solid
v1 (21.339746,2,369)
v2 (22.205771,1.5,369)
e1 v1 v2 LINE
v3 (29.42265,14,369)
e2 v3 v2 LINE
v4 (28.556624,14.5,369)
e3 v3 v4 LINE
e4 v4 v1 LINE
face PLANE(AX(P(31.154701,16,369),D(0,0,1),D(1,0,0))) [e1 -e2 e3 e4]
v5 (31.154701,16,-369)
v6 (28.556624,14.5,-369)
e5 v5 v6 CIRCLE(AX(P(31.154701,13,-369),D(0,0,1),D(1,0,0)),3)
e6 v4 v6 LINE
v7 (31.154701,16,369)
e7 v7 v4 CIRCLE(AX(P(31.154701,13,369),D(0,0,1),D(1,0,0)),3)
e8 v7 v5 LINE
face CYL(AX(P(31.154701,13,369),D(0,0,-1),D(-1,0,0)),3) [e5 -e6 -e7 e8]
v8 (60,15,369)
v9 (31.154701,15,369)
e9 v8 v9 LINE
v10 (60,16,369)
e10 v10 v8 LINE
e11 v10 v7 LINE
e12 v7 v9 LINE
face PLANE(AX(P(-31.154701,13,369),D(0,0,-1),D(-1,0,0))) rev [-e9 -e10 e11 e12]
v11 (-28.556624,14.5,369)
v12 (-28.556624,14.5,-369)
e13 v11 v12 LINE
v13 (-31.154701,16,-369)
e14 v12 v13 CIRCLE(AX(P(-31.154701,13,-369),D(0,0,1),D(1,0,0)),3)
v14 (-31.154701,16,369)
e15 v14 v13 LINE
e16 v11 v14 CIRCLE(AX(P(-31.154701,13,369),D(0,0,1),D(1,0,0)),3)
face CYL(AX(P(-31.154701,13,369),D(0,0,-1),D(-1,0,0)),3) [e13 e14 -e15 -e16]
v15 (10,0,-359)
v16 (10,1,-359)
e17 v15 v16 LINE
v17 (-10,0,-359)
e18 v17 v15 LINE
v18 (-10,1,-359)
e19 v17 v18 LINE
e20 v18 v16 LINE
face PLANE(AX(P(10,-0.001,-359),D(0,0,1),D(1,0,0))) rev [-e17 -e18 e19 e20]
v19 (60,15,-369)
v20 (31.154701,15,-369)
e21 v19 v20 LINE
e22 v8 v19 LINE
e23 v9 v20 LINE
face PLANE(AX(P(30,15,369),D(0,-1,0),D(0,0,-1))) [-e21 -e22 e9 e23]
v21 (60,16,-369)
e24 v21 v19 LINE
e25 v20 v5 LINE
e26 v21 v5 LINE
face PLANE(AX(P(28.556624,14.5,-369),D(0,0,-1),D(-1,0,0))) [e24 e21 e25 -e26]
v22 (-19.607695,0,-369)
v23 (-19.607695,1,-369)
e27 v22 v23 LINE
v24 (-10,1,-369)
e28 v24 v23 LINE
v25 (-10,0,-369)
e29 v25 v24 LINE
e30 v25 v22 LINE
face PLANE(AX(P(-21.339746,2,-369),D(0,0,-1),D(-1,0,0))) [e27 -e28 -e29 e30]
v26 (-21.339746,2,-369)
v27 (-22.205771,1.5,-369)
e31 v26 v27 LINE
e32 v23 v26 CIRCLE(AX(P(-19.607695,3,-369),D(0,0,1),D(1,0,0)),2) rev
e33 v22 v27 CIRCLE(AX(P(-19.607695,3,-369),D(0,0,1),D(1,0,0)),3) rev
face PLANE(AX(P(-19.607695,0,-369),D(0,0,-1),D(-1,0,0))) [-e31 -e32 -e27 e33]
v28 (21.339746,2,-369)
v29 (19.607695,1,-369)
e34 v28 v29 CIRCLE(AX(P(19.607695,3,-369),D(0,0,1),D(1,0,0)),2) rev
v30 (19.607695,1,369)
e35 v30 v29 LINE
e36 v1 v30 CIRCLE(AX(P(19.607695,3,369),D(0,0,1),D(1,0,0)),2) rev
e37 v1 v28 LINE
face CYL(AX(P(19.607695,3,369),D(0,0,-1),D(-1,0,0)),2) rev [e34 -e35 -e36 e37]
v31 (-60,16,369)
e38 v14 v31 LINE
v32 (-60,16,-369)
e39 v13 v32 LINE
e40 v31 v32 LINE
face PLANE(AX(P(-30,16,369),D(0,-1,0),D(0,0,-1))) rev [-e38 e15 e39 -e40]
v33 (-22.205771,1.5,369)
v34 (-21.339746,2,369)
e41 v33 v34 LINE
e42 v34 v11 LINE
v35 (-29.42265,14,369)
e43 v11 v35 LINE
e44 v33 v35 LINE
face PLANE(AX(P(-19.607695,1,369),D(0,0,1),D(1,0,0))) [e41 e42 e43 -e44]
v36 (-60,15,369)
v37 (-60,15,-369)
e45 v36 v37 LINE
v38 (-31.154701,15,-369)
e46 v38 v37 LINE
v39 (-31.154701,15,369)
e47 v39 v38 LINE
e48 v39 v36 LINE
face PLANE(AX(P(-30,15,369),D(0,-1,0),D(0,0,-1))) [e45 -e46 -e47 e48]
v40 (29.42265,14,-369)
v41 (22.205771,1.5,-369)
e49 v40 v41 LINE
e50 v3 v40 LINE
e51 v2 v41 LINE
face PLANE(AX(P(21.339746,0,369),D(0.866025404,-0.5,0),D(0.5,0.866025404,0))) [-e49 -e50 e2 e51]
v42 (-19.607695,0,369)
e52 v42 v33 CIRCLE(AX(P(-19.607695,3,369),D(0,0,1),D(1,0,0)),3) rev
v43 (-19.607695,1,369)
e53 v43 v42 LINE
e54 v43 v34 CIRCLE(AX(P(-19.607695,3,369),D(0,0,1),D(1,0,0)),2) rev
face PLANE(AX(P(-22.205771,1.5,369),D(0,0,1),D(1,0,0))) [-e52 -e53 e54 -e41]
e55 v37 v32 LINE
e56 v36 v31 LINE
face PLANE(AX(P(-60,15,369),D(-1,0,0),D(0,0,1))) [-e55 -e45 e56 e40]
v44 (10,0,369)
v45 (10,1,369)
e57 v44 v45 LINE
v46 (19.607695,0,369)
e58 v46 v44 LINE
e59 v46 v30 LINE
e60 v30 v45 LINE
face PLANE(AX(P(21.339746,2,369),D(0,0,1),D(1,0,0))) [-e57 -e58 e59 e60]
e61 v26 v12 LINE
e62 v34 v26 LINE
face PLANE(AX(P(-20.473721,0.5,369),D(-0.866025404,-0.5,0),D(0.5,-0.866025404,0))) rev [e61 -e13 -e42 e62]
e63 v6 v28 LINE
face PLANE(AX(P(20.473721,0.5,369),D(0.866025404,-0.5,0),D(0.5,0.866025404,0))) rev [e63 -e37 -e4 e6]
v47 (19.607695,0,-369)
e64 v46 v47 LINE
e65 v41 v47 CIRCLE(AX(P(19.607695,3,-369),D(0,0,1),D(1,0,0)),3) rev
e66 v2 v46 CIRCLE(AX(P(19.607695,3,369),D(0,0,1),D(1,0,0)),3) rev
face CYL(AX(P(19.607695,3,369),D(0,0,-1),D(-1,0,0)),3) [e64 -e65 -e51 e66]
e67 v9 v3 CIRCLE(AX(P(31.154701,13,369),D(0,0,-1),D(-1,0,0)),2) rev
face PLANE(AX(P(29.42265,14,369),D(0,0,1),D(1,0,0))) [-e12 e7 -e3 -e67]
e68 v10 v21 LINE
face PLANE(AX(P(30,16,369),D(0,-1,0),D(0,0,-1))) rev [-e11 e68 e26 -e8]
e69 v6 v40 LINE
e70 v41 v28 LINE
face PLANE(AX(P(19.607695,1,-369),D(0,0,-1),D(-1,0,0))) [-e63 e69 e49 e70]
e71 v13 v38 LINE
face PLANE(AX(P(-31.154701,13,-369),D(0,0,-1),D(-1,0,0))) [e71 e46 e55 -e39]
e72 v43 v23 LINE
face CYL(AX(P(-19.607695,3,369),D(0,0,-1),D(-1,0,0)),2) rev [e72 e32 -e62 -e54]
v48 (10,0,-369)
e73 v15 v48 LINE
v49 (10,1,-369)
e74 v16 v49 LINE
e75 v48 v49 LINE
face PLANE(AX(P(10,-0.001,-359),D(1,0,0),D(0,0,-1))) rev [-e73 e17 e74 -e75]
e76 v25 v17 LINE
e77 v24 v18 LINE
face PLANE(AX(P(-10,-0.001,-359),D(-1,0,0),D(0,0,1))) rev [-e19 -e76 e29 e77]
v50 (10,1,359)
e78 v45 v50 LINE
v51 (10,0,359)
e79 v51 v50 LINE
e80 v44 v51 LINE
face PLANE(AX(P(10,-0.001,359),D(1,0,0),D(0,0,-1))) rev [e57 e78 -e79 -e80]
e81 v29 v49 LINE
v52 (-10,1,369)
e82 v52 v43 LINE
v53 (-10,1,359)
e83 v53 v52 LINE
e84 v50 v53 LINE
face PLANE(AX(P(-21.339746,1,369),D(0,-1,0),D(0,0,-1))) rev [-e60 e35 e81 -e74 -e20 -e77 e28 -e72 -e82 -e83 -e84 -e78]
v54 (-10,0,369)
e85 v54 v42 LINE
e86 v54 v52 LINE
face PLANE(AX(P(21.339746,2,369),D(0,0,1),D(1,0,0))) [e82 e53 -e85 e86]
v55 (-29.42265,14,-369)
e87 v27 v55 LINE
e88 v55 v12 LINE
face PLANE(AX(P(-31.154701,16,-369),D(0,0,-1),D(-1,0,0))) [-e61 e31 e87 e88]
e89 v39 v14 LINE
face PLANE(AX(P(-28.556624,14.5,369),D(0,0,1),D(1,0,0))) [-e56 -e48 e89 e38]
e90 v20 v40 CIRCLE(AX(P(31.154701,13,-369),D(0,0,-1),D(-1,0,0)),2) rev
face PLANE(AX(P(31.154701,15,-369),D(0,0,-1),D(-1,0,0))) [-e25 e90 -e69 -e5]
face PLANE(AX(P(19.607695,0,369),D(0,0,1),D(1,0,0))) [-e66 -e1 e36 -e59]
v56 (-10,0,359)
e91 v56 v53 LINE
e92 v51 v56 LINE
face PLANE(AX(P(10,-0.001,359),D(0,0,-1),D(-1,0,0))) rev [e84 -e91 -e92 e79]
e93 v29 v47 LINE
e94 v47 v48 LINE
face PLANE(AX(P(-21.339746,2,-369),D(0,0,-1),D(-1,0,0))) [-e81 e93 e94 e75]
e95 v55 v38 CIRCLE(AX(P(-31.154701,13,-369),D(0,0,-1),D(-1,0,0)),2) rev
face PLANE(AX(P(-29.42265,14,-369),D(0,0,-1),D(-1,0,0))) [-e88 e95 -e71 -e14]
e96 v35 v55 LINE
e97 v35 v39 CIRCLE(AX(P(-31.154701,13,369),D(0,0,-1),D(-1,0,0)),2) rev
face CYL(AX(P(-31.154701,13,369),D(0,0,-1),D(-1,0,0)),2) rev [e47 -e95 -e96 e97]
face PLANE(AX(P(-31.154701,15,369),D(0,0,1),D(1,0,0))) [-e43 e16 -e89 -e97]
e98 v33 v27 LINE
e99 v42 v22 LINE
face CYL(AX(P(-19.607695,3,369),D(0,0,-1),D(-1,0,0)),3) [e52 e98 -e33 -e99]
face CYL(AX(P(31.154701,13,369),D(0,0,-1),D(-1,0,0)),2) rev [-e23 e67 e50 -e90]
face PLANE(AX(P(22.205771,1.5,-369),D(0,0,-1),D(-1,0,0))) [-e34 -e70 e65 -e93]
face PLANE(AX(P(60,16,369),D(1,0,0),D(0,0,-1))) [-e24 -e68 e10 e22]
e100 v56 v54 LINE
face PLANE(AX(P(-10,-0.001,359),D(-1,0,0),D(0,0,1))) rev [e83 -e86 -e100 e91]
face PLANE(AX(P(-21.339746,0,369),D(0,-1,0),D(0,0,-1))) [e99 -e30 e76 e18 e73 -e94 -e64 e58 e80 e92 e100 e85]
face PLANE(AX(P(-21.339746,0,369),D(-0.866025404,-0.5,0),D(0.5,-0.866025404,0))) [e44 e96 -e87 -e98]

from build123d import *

# Parameters (mm, degrees)
BASE_FLANGE1_DEPTH = 369
CUT_EXTRUDE1_REACH = 376.147
SKETCH2_W          = 20
SKETCH2_H          = 10


# Sheet-metal steps are written as plain solids
with BuildPart() as part:
    # Sketch1 → Base-Flange1 (new, symmetric)
    with BuildSketch(Plane.XY):
        with BuildLine():
            Line((-60, 15), (-31.154700538, 15))
            ThreePointArc((-31.154700538, 15), (-30.154700538, 14.732050808), (-29.422649731, 14))
            Line((-29.422649731, 14), (-22.205771366, 1.5))
            ThreePointArc((-22.205771366, 1.5), (-21.107695155, 0.401923789), (-19.607695155, 0))
            Line((-19.607695155, 0), (19.607695155, 0))
            ThreePointArc((19.607695155, 0), (21.107695155, 0.401923789), (22.205771366, 1.5))
            Line((22.205771366, 1.5), (29.422649731, 14))
            ThreePointArc((29.422649731, 14), (30.154700538, 14.732050808), (31.154700538, 15))
            Line((31.154700538, 15), (60, 15))
            Line((60, 15), (60, 16))
            Line((60, 16), (31.154700538, 16))
            ThreePointArc((31.154700538, 16), (29.654700538, 15.598076211), (28.556624327, 14.5))
            Line((28.556624327, 14.5), (21.339745962, 2))
            ThreePointArc((21.339745962, 2), (20.607695155, 1.267949192), (19.607695155, 1))
            Line((19.607695155, 1), (-19.607695155, 1))
            ThreePointArc((-19.607695155, 1), (-20.607695155, 1.267949192), (-21.339745962, 2))
            Line((-21.339745962, 2), (-28.556624327, 14.5))
            ThreePointArc((-28.556624327, 14.5), (-29.654700538, 15.598076211), (-31.154700538, 16))
            Line((-31.154700538, 16), (-60, 16))
            Line((-60, 16), (-60, 15))
        make_face()
    extrude(amount=BASE_FLANGE1_DEPTH, both=True)

    # Sketch2 → Cut-Extrude1 (cut, up to next)
    with BuildSketch(Plane(origin=(0, 1, 0), x_dir=(1, 0, 0), z_dir=(0, 1, 0)), mode=Mode.PRIVATE) as cut_extrude1_sk1:
        with Locations((0, 364)):
            Rectangle(SKETCH2_W, SKETCH2_H)
    cut_extrude1_tool1 = extrude(cut_extrude1_sk1.sketch, amount=-CUT_EXTRUDE1_REACH, mode=Mode.PRIVATE) & part.part
    # Sketch2 → Cut-Extrude1 (cut, up to next)
    with BuildSketch(Plane(origin=(0, 1, 0), x_dir=(1, 0, 0), z_dir=(0, 1, 0)), mode=Mode.PRIVATE) as cut_extrude1_sk2:
        with Locations((0, -364)):
            Rectangle(SKETCH2_W, SKETCH2_H)
    cut_extrude1_tool2 = extrude(cut_extrude1_sk2.sketch, amount=-CUT_EXTRUDE1_REACH, mode=Mode.PRIVATE) & part.part
    add(cut_extrude1_tool1.solids().sort_by_distance((0, 1, -364))[0], mode=Mode.SUBTRACT)
    add(cut_extrude1_tool2.solids().sort_by_distance((0, 1, 364))[0], mode=Mode.SUBTRACT)


solid = part.part
